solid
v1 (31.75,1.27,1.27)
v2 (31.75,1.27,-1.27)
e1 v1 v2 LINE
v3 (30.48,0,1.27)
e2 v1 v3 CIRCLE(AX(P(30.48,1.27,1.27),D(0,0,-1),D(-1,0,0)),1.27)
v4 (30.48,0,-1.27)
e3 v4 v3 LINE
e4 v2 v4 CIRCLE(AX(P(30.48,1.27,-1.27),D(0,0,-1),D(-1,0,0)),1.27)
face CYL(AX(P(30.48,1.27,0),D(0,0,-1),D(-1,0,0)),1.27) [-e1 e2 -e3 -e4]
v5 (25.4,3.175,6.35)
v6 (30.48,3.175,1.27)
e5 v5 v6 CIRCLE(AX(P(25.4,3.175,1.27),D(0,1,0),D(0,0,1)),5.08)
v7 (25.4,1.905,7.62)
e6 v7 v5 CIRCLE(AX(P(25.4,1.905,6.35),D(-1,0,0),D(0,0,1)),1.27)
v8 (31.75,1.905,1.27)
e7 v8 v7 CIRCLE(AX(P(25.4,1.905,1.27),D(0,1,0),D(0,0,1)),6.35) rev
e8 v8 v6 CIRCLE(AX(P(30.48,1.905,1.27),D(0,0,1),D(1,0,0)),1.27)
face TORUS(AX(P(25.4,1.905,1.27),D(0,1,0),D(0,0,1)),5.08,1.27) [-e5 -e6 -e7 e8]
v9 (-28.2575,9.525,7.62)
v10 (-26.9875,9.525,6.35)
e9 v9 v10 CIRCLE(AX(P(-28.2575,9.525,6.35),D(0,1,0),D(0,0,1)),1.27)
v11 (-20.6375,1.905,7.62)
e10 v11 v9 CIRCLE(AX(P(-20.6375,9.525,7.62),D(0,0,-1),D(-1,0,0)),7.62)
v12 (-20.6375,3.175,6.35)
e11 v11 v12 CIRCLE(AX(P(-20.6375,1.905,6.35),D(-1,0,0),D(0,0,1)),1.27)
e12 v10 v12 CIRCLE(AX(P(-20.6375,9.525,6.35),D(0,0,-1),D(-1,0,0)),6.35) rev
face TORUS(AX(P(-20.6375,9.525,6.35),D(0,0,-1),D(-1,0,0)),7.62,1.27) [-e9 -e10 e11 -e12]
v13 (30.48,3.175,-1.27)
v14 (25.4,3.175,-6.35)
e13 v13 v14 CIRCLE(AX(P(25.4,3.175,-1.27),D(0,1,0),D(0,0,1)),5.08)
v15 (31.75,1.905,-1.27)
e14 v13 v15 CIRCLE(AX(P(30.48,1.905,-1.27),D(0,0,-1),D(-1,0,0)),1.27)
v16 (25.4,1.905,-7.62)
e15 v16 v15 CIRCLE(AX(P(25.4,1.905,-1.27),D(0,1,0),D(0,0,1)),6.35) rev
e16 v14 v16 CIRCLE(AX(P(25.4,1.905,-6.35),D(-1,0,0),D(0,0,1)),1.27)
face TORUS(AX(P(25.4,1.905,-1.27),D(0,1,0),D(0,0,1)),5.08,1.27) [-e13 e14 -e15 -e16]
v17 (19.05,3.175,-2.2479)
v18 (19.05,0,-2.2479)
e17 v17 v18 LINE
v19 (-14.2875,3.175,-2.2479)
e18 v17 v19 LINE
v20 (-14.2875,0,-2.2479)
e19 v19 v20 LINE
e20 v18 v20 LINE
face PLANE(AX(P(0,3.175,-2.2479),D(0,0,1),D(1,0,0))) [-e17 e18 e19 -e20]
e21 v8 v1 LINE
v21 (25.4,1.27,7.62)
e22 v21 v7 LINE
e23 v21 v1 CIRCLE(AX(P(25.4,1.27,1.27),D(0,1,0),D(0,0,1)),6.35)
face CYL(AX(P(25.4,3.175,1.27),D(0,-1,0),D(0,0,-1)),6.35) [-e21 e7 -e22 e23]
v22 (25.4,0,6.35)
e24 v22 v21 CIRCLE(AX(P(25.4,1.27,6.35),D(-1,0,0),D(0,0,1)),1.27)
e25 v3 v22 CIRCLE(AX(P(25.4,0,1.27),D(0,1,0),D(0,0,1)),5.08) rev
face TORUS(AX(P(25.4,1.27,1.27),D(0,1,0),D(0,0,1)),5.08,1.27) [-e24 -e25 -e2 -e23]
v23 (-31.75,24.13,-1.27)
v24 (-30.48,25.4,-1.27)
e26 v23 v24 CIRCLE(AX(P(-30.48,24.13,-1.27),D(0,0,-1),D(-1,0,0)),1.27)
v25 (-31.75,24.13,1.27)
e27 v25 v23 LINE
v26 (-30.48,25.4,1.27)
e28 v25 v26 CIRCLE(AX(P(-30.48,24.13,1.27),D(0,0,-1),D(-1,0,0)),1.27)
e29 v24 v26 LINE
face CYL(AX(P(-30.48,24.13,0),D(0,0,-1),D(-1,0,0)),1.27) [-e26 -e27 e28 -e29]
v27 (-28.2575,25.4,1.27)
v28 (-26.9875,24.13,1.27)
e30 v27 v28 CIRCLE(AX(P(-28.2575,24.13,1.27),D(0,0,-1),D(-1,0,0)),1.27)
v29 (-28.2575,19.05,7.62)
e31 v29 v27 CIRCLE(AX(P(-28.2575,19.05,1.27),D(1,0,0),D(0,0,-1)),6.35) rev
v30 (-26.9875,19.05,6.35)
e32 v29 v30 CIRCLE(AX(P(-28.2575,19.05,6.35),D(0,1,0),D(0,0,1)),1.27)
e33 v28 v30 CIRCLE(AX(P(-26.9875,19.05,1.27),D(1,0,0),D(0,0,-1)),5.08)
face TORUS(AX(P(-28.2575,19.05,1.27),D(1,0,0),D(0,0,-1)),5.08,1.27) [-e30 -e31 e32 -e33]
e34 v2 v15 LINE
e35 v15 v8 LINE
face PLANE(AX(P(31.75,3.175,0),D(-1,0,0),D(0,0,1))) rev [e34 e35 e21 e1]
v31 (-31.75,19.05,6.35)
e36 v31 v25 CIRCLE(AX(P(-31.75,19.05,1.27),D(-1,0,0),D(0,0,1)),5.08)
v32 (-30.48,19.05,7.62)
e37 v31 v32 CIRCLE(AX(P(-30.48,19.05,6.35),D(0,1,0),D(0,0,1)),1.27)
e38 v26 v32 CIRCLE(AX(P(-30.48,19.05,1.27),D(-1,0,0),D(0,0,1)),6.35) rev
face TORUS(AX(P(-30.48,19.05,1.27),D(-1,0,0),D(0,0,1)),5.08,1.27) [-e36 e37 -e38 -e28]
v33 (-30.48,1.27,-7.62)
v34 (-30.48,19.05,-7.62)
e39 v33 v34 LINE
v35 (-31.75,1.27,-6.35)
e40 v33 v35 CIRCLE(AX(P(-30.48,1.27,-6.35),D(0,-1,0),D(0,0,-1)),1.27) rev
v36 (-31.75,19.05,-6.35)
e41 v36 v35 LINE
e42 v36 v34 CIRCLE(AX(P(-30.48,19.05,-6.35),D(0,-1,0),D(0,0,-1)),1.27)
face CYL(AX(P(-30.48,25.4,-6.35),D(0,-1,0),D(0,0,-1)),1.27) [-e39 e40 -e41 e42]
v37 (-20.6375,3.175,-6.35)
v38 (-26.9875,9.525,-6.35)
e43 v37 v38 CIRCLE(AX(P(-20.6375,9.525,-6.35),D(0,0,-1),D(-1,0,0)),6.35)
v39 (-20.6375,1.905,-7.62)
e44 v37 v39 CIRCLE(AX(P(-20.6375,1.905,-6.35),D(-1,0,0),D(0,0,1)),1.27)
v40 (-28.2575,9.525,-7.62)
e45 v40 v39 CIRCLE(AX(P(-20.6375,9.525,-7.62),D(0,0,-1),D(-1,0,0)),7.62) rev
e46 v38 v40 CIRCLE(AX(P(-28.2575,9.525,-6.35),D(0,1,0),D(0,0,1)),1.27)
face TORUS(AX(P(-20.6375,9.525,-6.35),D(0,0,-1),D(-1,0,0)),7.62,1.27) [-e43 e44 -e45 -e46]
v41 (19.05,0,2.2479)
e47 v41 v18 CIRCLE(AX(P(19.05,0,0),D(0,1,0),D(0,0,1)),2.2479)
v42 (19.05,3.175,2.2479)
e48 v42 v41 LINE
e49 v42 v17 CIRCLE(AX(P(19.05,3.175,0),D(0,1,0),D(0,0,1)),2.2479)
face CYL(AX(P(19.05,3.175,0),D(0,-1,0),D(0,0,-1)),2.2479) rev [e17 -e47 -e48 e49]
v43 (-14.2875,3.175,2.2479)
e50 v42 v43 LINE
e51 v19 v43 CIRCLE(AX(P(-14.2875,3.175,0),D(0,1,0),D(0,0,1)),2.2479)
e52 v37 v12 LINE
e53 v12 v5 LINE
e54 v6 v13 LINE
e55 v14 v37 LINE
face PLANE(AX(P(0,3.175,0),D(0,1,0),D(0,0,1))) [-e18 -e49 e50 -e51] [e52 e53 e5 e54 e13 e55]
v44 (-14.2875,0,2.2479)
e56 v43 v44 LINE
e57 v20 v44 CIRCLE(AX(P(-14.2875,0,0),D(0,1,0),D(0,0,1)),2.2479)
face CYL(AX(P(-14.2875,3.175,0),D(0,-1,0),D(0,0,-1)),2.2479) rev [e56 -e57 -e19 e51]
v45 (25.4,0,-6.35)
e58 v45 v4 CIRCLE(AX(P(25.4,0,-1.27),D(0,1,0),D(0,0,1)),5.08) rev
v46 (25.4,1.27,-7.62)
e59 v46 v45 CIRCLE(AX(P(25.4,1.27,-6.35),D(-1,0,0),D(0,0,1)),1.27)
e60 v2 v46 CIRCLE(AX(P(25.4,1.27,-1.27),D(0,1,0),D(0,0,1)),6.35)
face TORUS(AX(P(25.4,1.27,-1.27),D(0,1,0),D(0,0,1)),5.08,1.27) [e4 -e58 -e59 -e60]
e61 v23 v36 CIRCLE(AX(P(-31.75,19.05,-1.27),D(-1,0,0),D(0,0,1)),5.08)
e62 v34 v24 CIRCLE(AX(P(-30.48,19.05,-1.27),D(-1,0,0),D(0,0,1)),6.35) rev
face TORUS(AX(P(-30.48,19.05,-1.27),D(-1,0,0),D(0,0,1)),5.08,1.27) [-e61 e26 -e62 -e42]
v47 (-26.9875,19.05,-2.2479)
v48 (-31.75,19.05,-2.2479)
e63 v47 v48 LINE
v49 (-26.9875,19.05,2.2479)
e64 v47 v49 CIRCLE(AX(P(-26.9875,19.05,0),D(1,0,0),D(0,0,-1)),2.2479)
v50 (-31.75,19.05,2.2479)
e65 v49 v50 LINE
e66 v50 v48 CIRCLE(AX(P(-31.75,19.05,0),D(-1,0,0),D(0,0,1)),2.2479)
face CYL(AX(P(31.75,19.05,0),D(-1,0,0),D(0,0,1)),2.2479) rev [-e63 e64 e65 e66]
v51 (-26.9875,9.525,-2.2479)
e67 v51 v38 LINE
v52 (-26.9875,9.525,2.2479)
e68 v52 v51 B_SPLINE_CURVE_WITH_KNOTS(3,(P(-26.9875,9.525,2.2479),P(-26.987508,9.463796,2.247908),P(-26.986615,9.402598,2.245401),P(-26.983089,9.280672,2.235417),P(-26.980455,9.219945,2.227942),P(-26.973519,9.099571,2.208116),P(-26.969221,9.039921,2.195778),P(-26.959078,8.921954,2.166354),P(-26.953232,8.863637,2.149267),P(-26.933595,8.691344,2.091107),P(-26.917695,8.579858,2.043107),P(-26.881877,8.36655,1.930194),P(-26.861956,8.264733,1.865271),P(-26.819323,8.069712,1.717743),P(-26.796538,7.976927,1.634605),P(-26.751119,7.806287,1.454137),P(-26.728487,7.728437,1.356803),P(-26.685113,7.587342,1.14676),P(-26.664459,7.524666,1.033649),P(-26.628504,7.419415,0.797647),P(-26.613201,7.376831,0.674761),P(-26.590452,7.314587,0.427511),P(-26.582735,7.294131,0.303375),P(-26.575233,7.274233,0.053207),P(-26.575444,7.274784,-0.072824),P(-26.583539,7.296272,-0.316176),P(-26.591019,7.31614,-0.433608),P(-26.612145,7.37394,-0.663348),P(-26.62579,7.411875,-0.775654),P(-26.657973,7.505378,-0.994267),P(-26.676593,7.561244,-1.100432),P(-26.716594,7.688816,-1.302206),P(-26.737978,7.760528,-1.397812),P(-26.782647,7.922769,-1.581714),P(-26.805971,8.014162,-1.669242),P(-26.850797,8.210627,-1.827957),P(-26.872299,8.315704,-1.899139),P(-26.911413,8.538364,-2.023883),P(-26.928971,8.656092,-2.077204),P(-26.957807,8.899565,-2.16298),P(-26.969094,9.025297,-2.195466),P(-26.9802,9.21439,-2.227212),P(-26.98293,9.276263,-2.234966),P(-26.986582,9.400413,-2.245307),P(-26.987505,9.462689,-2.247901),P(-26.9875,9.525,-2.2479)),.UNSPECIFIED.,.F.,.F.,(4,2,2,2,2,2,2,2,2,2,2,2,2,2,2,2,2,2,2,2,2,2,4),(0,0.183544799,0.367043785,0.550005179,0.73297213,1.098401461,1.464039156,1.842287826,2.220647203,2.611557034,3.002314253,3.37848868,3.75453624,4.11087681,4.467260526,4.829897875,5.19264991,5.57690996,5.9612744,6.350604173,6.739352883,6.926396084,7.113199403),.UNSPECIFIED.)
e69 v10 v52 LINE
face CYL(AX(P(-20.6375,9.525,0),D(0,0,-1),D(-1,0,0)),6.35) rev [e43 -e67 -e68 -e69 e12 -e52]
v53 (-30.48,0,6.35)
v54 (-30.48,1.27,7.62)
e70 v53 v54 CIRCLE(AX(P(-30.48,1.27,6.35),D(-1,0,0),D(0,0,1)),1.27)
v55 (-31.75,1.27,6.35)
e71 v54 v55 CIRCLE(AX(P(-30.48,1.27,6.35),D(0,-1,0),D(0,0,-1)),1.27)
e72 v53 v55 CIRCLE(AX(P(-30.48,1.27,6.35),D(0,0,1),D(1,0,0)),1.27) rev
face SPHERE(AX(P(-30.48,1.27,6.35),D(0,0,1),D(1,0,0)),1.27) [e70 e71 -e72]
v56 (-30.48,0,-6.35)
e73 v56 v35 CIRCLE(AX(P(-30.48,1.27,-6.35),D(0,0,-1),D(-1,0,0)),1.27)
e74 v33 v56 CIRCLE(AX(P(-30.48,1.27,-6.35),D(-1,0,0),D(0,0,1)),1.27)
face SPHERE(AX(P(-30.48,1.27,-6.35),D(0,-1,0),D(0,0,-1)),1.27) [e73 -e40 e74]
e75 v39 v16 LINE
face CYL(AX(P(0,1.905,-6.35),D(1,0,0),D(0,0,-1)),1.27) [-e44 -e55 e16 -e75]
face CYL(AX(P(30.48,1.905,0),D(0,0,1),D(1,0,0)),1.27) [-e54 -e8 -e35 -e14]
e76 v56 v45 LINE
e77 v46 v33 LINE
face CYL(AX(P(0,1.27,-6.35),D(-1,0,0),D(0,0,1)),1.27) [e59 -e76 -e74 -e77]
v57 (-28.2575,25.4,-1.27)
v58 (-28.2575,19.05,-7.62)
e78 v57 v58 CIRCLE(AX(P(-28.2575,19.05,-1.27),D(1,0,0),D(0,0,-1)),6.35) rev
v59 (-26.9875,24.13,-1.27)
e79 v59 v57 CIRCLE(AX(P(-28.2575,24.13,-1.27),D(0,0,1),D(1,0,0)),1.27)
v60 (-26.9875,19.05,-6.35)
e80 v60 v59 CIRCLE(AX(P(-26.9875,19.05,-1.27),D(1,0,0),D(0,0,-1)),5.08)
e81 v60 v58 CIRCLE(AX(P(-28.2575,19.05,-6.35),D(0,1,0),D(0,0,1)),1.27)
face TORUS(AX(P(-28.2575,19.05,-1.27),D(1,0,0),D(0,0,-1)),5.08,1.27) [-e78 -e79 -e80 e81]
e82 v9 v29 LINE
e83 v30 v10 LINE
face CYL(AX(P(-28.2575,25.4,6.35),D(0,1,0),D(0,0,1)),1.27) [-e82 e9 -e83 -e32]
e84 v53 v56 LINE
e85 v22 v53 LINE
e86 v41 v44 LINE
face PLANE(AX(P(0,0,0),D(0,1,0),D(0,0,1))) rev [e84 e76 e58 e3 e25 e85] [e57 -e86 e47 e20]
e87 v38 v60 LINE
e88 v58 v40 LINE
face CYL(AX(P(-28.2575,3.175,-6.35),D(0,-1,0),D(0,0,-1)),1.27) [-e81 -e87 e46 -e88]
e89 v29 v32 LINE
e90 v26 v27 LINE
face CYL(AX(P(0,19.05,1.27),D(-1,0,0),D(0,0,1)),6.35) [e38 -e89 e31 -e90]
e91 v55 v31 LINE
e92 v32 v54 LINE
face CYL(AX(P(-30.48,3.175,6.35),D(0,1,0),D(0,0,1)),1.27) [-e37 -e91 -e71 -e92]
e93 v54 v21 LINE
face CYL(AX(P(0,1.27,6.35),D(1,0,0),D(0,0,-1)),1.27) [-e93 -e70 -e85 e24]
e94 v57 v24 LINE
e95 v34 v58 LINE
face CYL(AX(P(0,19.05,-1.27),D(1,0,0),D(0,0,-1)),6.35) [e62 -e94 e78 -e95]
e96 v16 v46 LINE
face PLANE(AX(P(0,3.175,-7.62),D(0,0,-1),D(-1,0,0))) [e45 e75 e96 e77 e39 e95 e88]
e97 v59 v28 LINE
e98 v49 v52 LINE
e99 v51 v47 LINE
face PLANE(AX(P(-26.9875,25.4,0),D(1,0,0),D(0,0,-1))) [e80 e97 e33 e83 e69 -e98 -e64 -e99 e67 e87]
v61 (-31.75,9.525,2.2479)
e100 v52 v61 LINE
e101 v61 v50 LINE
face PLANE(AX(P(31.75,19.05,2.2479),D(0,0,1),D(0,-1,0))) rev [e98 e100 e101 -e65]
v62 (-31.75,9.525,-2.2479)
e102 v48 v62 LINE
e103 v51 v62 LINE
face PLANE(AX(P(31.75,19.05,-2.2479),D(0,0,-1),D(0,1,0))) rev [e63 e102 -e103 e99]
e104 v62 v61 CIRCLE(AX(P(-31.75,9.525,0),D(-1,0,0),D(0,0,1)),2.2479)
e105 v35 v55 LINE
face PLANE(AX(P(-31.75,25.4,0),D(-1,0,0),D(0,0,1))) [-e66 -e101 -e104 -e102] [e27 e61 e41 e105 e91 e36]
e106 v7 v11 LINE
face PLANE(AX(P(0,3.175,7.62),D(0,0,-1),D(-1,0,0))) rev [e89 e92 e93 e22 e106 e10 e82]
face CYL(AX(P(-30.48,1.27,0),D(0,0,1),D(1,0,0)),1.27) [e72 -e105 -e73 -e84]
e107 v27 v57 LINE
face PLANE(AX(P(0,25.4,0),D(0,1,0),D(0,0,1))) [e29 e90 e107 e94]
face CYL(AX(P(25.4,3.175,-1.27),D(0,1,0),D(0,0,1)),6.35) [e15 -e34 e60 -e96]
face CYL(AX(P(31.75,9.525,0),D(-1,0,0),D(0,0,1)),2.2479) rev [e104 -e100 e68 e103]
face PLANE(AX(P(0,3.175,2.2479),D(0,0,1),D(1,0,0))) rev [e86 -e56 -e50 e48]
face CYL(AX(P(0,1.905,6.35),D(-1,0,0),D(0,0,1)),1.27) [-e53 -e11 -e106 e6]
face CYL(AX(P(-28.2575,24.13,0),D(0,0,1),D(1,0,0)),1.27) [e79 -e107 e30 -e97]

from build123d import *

# Parameters (mm, degrees)
ESQUISSE1_W                  = 58.7375
ESQUISSE1_H                  = 15.24
BOSS_EXTRU_1_DEPTH           = 3.175
ESQUISSE1_3_W                = 4.7625
ESQUISSE1_3_H                = 15.24
BOSS_EXTRU_2_DEPTH           = 25.4
ENL_V_MAT_EXTRU_1_DEPTH      = 69.814783295
ENL_V_MAT_EXTRU_1_DEPTH_BACK = 69.814783295
CONG_1_R                     = 6.35
CONG_2_R                     = 1.27


with BuildPart() as part:
    # Esquisse1 → Boss.-Extru.1 (new body)
    with BuildSketch(Plane(origin=(0, 0, 0), x_dir=(1, 0, 0), z_dir=(0, 1, 0))):
        with Locations((2.38125, 0)):
            Rectangle(ESQUISSE1_W, ESQUISSE1_H)
        with BuildLine():
            ThreePointArc((19.05, 2.2479), (21.2979, 0), (19.05, -2.2479))
            Line((19.05, -2.2479), (-14.2875, -2.2479))
            ThreePointArc((-14.2875, -2.2479), (-16.5354, 0), (-14.2875, 2.2479))
            Line((-14.2875, 2.2479), (19.05, 2.2479))
        make_face(mode=Mode.SUBTRACT)
    extrude(amount=BOSS_EXTRU_1_DEPTH)

    # Esquisse1<3> → Boss.-Extru.2 (add)
    with BuildSketch(Plane(origin=(0, 0, 0), x_dir=(1, 0, 0), z_dir=(0, 1, 0))):
        with Locations((-29.36875, 0)):
            Rectangle(ESQUISSE1_3_W, ESQUISSE1_3_H)
    extrude(amount=BOSS_EXTRU_2_DEPTH)

    # Esquisse3 → Enlèv. mat.-Extru.1 (cut, two sides: drawn at the far end of the back side and taken through both)
    with BuildSketch(Plane.ZY.offset(31.75).offset(-ENL_V_MAT_EXTRU_1_DEPTH_BACK)):
        with BuildLine():
            Line((2.2479, 19.05), (2.2479, 9.525))
            ThreePointArc((2.2479, 9.525), (0, 7.2771), (-2.2479, 9.525))
            Line((-2.2479, 9.525), (-2.2479, 19.05))
            ThreePointArc((-2.2479, 19.05), (0, 21.2979), (2.2479, 19.05))
        make_face()
    extrude(amount=ENL_V_MAT_EXTRU_1_DEPTH + ENL_V_MAT_EXTRU_1_DEPTH_BACK, mode=Mode.SUBTRACT)

    # Congé1
    # the kernel refuses this fillet: 6.35 mm, written as the material it adds along each edge
    with BuildSketch(Plane(origin=(-26.9875, 3.175, -7.62), x_dir=(1, 0, 0), z_dir=(0, 0, 1))) as cong_1_piece_1_section:
        with BuildLine():
            CenterArc((CONG_1_R, CONG_1_R), CONG_1_R, 180, 90)
            Line((0, CONG_1_R), (0, 0))
            Line((0, 0), (CONG_1_R, 0))
        make_face()
    cong_1_piece_1 = extrude(amount=15.24, mode=Mode.PRIVATE)
    cong_1_piece_1 = cong_1_piece_1 - Plane(origin=(-25.549891024, 9.525, 0), x_dir=(0, 0, 1), z_dir=(1, 0, 0)) * Cylinder(2.2479, 56, mode=Mode.PRIVATE)
    add(cong_1_piece_1)
    # the kernel refuses this fillet: 6.35 mm, written as the material it takes off along each edge
    with BuildSketch(Plane(origin=(31.75, -15.875, 7.62), x_dir=(0, 0, -1), z_dir=(0, 1, 0)), Plane(origin=(31.75, -15.875, -7.62), x_dir=(-1, 0, 0), z_dir=(0, 1, 0))) as cong_1_2_piece_1:
        with BuildLine():
            CenterArc((CONG_1_R, CONG_1_R), CONG_1_R, 180, 90)
            Line((0, CONG_1_R), (0, 0))
            Line((0, 0), (CONG_1_R, 0))
        make_face()
    extrude(amount=34.925, mode=Mode.SUBTRACT)
    with BuildSketch(Plane(origin=(-11.1125, 25.4, -7.62), x_dir=(0, -1, 0), z_dir=(-1, 0, 0))) as cong_1_2_piece_2:
        with BuildLine():
            CenterArc((CONG_1_R, CONG_1_R), CONG_1_R, 180, 90)
            Line((0, CONG_1_R), (0, 0))
            Line((0, 0), (CONG_1_R, 0))
        make_face()
    extrude(amount=36.5125, mode=Mode.SUBTRACT)
    with BuildSketch(Plane(origin=(-47.625, 25.4, 7.62), x_dir=(0, 0, -1), z_dir=(1, 0, 0))) as cong_1_2_piece_3:
        with BuildLine():
            CenterArc((CONG_1_R, -CONG_1_R), CONG_1_R, 90, 90)
            Line((0, -CONG_1_R), (0, 0))
            Line((0, 0), (CONG_1_R, 0))
        make_face()
    extrude(amount=36.5125, mode=Mode.SUBTRACT)

    # Congé2
    cong_2_edges = [part.edges().sort_by_distance(p)[0] for p in [
        (-3.175, 0, -7.62),
        (-3.175, 0, 7.62),
        (-31.75, 0, 0),
        (2.38125, 3.175, 7.62),
        (31.75, 3.175, 0),
        (2.38125, 3.175, -7.62),
        (29.890128061, 3.175, -5.760128061),
        (29.890128061, 3.175, 5.760128061),
        (-26.9875, 14.2875, -7.62),
        (-26.9875, 25.4, 0),
        (-26.9875, 14.2875, 7.62),
        (-26.9875, 23.540128061, 5.760128061),
        (-26.9875, 23.540128061, -5.760128061),
        (31.75, 0, 0),
        (29.890128061, 0, -5.760128061),
        (29.890128061, 0, 5.760128061),
        (-31.75, 9.525, 7.62),
        (-31.75, 9.525, -7.62),
        (-31.75, 25.4, 0),
        (-31.75, 23.540128061, 5.760128061),
        (-31.75, 23.540128061, -5.760128061),
        (-25.127628061, 5.034871939, 7.62),
        (-25.127628061, 5.034871939, -7.62),
    ]]
    fillet(cong_2_edges, radius=CONG_2_R)


solid = part.part
